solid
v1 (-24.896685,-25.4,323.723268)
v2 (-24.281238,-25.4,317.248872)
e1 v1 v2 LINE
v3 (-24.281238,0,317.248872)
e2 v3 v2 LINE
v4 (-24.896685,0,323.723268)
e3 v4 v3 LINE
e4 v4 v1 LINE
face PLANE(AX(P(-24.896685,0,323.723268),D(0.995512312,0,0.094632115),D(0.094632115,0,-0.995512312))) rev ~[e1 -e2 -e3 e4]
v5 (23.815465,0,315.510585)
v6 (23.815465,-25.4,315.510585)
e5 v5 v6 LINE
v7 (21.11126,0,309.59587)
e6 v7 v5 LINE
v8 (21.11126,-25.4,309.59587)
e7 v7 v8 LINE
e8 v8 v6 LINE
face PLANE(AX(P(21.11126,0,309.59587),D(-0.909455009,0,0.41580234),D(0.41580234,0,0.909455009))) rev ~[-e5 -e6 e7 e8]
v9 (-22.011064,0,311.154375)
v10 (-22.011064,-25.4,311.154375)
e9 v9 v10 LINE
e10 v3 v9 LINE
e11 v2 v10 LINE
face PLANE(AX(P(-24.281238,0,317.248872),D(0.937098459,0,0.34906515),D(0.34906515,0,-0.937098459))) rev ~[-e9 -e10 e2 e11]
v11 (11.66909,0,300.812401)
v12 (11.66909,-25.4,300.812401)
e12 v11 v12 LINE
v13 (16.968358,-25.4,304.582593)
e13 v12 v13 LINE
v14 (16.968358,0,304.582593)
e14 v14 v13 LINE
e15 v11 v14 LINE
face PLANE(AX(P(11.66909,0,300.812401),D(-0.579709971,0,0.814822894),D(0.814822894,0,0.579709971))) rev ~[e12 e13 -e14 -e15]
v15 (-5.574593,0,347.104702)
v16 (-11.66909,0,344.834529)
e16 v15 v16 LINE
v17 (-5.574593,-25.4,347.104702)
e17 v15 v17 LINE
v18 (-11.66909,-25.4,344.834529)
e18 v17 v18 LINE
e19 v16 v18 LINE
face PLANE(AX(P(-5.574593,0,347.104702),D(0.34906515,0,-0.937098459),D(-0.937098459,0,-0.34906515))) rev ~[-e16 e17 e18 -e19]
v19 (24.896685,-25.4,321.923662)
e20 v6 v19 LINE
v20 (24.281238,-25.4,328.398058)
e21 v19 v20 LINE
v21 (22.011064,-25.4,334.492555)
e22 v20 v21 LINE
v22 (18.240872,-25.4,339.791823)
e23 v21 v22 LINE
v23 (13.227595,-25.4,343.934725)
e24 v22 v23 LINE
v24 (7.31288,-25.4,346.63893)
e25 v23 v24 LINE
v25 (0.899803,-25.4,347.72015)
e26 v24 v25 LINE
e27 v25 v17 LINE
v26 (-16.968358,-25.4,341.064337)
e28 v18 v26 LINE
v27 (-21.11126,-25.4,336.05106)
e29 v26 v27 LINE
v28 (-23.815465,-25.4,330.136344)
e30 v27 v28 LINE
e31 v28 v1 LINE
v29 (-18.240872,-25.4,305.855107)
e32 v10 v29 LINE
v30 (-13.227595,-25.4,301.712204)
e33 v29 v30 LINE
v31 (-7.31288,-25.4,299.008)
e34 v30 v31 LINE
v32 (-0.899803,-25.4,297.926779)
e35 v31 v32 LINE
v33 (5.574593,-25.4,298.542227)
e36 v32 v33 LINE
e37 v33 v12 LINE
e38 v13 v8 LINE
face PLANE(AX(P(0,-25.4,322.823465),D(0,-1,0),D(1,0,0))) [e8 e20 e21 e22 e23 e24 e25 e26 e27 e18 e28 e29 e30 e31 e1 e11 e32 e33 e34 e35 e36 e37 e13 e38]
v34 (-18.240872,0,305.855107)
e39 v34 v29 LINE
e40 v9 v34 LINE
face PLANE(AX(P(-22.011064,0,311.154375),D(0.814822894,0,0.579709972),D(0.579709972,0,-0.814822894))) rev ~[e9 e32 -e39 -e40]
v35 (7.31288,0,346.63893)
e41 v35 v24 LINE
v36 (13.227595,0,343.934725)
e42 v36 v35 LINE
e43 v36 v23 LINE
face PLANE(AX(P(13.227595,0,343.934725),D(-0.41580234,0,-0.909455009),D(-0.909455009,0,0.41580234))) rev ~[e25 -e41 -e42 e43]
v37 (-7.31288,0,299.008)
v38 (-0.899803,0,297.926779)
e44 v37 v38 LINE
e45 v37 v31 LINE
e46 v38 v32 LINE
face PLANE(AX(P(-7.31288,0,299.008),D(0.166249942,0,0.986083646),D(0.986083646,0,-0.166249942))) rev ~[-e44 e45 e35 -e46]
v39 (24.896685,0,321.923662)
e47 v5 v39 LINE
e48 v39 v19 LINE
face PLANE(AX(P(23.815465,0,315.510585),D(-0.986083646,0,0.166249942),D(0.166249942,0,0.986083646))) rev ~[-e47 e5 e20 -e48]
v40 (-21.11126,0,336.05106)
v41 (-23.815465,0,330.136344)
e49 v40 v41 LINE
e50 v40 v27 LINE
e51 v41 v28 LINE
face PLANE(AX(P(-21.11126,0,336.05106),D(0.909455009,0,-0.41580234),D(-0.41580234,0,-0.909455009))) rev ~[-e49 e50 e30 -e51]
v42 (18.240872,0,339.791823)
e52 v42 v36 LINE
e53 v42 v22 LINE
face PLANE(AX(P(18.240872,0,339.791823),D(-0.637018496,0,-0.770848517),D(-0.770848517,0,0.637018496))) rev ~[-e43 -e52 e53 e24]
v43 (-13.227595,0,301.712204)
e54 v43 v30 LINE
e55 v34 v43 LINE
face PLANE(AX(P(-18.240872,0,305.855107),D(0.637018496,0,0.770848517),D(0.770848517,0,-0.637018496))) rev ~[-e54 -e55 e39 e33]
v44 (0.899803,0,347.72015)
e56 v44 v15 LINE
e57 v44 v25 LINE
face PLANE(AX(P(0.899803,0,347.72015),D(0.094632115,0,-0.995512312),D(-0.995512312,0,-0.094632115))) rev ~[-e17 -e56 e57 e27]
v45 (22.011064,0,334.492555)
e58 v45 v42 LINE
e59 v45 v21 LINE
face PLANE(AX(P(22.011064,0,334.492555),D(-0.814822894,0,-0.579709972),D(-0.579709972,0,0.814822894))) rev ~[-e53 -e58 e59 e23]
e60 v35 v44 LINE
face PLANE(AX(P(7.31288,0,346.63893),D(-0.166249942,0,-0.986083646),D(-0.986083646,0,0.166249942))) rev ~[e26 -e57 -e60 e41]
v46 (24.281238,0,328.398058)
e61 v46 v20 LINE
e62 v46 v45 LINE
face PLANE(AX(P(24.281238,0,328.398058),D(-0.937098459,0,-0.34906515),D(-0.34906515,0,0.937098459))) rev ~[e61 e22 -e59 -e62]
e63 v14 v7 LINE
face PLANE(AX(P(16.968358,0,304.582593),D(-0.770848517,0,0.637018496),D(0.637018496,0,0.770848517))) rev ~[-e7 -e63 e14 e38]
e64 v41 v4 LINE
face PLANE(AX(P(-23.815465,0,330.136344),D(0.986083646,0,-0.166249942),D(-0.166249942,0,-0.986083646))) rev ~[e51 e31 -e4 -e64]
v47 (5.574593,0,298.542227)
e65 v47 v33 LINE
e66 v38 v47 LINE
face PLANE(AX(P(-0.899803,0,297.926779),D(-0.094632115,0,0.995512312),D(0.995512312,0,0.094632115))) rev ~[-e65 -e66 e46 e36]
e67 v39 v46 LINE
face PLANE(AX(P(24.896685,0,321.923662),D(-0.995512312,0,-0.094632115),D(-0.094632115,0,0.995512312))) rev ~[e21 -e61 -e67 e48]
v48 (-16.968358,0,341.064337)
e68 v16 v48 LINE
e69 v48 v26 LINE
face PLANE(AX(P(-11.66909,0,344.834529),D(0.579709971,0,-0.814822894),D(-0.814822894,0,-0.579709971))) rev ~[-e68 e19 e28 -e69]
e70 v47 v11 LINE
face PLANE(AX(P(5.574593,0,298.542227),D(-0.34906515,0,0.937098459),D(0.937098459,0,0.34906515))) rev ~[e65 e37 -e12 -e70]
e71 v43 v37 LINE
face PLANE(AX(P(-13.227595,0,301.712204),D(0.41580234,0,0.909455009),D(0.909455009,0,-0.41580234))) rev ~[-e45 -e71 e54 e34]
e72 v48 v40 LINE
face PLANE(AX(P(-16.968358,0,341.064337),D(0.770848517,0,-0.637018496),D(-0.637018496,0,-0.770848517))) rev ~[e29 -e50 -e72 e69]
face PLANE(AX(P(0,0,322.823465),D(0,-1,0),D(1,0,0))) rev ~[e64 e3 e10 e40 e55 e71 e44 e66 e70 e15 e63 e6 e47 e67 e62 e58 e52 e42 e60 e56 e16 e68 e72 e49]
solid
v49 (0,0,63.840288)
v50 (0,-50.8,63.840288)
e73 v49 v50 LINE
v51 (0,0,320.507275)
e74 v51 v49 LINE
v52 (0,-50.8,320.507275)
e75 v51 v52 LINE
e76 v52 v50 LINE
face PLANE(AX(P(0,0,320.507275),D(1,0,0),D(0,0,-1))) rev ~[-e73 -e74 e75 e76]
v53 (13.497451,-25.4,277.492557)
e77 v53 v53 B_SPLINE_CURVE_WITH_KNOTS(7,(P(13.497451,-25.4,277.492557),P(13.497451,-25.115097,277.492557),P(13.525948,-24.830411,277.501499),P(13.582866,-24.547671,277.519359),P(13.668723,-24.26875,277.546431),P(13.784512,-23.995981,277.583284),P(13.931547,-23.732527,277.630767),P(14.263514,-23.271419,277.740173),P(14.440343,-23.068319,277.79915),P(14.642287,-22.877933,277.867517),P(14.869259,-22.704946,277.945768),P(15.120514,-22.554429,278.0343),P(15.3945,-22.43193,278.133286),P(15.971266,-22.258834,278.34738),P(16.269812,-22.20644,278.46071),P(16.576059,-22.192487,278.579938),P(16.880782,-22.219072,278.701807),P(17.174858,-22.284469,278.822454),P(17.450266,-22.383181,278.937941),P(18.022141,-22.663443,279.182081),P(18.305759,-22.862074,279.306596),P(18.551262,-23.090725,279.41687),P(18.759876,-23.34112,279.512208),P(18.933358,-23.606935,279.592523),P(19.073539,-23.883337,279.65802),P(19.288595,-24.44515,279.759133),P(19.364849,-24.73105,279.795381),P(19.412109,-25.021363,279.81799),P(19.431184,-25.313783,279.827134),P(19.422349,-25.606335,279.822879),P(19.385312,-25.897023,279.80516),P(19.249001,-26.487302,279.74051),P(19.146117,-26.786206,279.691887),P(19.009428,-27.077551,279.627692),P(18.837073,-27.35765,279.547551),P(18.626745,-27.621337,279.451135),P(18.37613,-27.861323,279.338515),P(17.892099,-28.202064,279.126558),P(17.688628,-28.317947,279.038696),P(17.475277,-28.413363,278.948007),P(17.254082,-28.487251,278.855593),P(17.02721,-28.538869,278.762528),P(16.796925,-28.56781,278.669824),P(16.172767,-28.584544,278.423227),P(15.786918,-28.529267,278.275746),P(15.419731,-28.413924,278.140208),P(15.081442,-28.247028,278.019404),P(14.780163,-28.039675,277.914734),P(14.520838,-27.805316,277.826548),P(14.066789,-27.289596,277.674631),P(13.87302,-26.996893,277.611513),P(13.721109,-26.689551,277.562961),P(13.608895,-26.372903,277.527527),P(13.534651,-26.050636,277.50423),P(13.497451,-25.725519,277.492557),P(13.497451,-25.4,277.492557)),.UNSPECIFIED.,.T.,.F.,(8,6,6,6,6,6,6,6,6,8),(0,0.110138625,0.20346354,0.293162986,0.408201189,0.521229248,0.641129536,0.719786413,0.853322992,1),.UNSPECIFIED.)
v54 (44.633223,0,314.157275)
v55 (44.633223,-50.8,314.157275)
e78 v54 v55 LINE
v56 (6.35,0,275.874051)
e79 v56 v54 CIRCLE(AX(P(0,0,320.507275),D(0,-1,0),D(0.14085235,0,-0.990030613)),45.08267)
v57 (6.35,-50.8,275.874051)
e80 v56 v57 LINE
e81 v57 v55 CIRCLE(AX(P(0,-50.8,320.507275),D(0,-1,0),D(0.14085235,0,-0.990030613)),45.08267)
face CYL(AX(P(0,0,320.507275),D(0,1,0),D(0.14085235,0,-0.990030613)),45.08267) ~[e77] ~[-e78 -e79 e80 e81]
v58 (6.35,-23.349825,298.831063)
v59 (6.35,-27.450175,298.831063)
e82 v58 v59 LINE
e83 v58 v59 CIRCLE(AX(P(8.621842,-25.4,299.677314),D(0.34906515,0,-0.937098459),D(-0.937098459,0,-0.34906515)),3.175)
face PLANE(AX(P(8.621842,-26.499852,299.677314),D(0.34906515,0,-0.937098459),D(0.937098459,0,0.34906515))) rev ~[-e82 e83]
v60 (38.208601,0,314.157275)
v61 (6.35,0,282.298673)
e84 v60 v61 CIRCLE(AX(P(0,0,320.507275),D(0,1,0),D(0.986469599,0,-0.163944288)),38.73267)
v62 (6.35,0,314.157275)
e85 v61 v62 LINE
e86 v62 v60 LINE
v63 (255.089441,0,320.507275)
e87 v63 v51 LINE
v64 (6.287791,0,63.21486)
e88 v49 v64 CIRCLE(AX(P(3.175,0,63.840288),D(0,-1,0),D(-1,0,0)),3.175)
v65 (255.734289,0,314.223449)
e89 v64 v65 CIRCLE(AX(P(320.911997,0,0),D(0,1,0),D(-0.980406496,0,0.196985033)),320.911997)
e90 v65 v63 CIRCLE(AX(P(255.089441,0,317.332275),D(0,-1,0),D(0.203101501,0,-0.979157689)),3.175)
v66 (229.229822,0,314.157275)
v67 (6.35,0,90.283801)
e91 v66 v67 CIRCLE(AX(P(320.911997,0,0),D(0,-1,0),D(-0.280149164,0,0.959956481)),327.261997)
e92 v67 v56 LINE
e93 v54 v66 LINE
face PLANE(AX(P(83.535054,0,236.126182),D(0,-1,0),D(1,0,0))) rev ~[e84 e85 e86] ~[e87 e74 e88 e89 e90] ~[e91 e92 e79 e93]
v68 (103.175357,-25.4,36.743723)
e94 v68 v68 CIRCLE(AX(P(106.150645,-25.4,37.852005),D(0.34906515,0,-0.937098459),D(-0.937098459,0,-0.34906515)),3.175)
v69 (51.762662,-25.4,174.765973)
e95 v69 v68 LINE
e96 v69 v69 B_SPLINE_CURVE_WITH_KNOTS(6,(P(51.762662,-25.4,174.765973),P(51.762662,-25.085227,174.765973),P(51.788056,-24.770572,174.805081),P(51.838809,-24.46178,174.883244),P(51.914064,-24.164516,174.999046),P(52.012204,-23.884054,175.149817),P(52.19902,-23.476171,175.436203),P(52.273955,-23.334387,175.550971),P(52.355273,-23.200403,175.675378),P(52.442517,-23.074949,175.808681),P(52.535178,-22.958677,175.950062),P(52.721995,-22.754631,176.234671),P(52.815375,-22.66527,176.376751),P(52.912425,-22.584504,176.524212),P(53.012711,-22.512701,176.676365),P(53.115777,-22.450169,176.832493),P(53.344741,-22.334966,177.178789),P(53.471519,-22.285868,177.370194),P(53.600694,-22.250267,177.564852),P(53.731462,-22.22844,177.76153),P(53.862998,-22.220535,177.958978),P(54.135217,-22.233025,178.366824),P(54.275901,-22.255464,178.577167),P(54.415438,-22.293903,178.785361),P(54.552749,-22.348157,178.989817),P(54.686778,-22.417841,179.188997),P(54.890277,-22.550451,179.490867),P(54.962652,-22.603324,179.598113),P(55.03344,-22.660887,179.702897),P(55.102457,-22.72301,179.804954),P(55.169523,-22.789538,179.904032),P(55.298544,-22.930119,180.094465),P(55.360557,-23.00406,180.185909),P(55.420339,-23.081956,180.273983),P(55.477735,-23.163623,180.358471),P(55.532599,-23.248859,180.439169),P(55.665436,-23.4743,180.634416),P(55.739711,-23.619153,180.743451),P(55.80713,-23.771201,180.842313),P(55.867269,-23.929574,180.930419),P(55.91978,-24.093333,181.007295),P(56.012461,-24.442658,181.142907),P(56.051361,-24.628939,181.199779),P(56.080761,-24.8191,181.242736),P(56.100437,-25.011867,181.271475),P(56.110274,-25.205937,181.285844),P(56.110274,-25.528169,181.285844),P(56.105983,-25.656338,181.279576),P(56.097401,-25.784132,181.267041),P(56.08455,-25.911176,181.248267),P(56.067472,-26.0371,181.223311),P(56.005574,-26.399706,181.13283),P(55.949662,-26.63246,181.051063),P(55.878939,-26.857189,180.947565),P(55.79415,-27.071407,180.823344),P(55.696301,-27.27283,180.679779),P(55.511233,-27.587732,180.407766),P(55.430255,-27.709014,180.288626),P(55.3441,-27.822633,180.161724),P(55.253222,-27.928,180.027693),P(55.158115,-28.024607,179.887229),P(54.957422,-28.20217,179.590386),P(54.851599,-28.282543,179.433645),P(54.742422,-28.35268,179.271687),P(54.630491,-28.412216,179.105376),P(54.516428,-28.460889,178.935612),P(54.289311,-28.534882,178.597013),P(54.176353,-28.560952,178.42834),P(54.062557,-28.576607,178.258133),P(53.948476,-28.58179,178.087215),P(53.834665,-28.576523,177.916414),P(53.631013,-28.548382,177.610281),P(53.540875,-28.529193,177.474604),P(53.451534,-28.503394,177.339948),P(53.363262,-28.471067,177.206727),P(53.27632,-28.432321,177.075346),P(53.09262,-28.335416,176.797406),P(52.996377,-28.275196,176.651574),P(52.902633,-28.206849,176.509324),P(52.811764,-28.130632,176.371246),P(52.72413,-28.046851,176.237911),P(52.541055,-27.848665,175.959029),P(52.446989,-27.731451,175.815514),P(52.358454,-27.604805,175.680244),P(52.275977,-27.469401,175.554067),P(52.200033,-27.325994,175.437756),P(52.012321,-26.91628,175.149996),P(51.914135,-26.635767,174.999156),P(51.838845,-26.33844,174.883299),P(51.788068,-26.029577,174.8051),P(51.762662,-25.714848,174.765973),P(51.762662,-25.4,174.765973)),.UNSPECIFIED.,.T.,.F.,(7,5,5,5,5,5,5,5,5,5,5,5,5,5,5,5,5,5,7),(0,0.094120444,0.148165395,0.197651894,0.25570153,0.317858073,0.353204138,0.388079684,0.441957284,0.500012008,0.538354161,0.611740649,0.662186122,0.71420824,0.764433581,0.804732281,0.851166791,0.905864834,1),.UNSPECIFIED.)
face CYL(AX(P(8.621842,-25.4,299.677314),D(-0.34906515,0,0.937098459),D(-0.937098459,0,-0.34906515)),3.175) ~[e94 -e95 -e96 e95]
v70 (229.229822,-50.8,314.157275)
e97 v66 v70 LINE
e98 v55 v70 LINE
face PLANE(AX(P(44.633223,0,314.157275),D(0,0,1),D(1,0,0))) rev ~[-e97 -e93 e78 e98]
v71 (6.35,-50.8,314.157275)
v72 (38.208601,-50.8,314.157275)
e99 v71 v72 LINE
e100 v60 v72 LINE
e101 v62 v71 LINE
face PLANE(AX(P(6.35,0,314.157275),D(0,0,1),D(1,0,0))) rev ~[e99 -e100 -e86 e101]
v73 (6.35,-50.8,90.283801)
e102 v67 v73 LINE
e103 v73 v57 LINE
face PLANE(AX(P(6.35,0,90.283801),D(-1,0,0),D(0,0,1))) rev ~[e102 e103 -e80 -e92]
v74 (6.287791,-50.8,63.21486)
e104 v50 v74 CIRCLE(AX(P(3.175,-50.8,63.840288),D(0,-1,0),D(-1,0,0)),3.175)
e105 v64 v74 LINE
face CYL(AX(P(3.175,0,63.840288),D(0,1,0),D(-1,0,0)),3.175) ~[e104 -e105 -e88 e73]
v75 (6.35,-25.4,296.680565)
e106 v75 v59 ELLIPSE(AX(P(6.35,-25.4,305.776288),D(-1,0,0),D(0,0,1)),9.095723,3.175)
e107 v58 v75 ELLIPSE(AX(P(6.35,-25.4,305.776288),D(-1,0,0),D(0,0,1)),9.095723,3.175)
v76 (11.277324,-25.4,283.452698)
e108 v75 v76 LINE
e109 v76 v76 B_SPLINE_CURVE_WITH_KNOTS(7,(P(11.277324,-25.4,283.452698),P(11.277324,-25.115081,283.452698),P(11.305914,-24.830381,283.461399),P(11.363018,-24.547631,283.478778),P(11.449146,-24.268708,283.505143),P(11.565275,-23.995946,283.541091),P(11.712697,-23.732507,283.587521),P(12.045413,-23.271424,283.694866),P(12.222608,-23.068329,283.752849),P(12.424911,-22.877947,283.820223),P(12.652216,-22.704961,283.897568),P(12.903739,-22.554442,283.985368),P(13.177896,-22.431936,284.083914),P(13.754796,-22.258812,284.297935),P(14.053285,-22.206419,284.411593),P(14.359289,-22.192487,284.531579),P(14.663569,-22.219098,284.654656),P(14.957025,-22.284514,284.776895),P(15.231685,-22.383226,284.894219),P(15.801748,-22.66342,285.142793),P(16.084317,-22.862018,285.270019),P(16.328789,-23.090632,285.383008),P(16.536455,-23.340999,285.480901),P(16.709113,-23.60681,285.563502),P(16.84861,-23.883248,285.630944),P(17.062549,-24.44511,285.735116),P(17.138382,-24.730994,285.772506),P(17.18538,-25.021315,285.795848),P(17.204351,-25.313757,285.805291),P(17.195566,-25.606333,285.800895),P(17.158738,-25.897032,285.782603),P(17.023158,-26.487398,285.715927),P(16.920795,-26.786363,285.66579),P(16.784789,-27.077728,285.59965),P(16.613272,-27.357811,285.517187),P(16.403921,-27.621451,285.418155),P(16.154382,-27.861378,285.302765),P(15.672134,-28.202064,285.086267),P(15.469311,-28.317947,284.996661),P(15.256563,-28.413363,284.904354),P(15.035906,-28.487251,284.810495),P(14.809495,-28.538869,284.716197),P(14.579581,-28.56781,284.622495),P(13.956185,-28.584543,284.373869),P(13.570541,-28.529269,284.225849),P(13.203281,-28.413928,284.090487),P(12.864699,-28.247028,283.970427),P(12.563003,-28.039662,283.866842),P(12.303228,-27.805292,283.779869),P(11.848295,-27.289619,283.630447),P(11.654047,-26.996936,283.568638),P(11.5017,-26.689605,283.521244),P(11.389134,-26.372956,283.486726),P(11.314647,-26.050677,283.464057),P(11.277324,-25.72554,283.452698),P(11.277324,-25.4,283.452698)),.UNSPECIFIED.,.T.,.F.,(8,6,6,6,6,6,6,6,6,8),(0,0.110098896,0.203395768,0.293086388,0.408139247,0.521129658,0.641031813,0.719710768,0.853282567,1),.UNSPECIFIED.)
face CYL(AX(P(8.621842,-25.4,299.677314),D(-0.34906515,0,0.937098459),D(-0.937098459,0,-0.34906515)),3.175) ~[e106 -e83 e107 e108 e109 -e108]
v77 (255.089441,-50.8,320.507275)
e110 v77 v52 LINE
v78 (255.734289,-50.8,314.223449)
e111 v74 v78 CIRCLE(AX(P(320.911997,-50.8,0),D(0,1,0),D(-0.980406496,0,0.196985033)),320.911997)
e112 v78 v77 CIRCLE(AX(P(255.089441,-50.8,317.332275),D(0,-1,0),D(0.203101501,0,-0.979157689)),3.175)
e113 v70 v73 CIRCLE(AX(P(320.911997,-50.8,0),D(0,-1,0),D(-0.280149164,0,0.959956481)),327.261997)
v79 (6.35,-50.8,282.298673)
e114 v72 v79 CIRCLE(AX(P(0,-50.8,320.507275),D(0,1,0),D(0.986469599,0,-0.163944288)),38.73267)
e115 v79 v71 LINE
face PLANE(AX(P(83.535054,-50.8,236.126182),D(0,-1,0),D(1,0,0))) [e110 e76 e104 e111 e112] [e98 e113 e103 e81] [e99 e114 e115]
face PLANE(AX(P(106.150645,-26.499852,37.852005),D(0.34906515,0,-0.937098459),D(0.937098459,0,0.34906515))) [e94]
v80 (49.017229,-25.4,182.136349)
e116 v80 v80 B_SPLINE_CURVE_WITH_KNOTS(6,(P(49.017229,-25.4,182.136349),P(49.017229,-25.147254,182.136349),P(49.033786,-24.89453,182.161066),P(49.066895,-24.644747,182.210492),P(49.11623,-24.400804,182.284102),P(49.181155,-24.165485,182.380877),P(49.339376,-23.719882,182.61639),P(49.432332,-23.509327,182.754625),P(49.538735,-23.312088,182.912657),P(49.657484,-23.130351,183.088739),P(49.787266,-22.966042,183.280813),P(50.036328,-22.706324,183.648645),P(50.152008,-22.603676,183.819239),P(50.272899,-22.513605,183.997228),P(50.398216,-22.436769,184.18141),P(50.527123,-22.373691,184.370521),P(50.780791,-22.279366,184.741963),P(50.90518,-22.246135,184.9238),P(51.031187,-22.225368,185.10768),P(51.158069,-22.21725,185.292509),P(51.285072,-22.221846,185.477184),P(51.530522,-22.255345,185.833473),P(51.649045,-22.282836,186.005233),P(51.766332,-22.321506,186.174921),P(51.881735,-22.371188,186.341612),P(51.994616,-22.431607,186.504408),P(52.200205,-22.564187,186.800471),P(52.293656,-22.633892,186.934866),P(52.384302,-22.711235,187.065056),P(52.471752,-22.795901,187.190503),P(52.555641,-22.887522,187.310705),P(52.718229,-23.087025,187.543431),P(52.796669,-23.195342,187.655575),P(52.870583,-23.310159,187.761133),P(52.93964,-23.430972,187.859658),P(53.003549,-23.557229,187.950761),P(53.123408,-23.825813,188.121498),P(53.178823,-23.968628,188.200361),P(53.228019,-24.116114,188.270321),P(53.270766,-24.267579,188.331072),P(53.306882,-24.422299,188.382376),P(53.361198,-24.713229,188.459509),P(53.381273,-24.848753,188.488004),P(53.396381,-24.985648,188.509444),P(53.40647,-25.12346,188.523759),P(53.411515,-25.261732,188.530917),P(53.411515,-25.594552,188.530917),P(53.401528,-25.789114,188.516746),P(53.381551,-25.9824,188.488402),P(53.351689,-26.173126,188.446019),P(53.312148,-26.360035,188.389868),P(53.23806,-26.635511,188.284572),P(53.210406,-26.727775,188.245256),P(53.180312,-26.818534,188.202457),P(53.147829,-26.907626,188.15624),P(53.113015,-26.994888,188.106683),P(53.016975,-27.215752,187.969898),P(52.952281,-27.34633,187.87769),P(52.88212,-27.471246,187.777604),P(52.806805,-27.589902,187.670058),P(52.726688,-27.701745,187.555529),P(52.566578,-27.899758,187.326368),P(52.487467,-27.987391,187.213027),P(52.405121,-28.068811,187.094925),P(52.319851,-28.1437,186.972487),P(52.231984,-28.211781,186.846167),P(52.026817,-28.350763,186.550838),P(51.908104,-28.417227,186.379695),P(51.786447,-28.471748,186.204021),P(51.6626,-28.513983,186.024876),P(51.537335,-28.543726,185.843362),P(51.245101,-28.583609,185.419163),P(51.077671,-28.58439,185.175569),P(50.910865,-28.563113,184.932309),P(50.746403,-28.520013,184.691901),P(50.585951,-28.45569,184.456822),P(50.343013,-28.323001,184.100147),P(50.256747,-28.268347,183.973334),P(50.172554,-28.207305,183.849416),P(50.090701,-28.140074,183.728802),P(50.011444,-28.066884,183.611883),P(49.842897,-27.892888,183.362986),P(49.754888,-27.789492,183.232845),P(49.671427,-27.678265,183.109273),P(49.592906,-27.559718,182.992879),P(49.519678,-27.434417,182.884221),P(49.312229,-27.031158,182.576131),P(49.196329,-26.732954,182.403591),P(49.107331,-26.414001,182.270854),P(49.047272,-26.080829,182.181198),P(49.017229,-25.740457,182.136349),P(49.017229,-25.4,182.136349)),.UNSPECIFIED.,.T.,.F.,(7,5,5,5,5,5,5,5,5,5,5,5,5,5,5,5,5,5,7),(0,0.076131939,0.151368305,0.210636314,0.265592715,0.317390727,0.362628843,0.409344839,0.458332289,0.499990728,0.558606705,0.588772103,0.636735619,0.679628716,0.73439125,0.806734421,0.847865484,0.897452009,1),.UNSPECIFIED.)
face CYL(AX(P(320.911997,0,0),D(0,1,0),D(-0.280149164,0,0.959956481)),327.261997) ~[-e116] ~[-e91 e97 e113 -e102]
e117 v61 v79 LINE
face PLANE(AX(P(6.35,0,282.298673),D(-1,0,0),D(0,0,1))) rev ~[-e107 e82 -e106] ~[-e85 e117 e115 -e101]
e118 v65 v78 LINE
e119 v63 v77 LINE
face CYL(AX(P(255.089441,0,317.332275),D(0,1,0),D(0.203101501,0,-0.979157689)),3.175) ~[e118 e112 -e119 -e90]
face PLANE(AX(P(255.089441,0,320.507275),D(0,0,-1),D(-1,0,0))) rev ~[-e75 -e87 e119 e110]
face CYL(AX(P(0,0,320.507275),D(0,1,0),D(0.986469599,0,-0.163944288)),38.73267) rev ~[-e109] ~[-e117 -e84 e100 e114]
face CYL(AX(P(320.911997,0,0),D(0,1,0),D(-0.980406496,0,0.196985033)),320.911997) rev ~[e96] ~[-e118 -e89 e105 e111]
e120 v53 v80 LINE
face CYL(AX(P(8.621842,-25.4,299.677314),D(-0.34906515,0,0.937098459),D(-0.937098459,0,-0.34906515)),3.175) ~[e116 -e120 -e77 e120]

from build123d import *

# Parameters (mm, degrees)
F1_DEPTH = 50.8
F3_DEPTH = 25.4
F6_DEPTH = 279.4


with BuildPart() as f1:
    # F0 (on Front) → F1 (new body)
    with BuildSketch(Plane.XZ):
        with BuildLine():
            Line((0, 320.5072749112), (0, 63.8402879052))
            ThreePointArc((0, 63.8402879052), (2.8607431223, 60.6808785276), (6.2877906235, 63.214860424))
            ThreePointArc((6.2877906235, 63.214860424), (93.2857648732, 226.2096554871), (255.734288563, 314.2234492481))
            ThreePointArc((255.734288563, 314.2234492481), (258.247854386, 317.6563918034), (255.0894412971, 320.5072749112))
            Line((255.0894412971, 320.5072749112), (0, 320.5072749112))
        make_face()
        with BuildLine():
            Line((6.35, 275.8740514516), (6.35, 282.2986734306))
            Line((6.35, 282.2986734306), (6.35, 314.1572749112))
            Line((6.35, 314.1572749112), (38.2086014806, 314.1572749112))
            Line((38.2086014806, 314.1572749112), (44.6332234596, 314.1572749112))
            Line((44.6332234596, 314.1572749112), (229.2298219421, 314.1572749112))
            ThreePointArc((229.2298219421, 314.1572749112), (88.988701653, 230.893914438), (6.35, 90.2838009813))
            Line((6.35, 90.2838009813), (6.35, 275.8740514516))
        make_face(mode=Mode.SUBTRACT)
        with BuildLine():
            ThreePointArc((38.2086014806, 314.1572749112), (27.3881336266, 293.1191412846), (6.35, 282.2986734306))
            Line((6.35, 282.2986734306), (6.35, 275.8740514516))
            ThreePointArc((6.35, 275.8740514516), (31.8782616872, 288.629013224), (44.6332234596, 314.1572749112))
            Line((44.6332234596, 314.1572749112), (38.2086014806, 314.1572749112))
        make_face()
    extrude(amount=F1_DEPTH)

    # F4 (on face) → F6 (join)
    with BuildSketch(Plane(origin=(-96.9764298817, 0, 260.3424117621), x_dir=(0.9370984586, 0, 0.3490651498), z_dir=(0.3490651498, 0, -0.9370984586))):
        with BuildLine():
            Line((109.5114211305, 25.4), (115.8614211305, 25.4))
            ThreePointArc((115.8614211305, 25.4), (112.6864211305, 28.575), (109.5114211305, 25.4))
        make_face()
        with BuildLine():
            ThreePointArc((109.5114211305, 25.4), (112.6864211305, 22.225), (115.8614211305, 25.4))
            Line((115.8614211305, 25.4), (109.5114211305, 25.4))
        make_face()
    extrude(amount=F6_DEPTH)


with BuildPart() as f3:
    # F2 (on Front) → F3 (new body)
    with BuildSketch(Plane.XZ):
        Polygon((24.2812376232, 328.3980579991), (22.0110636442, 334.49255508), (18.2408720527, 339.7918229472), (13.2275951754, 343.934725253), (7.3128795465, 346.6389300518), (0.8998032616, 347.7201502554), (-5.5745931286, 347.1047024937), (-11.6690902095, 344.8345285146), (-16.9683580768, 341.0643369232), (-21.1112603826, 336.0510600458), (-23.8154651814, 330.1363444169), (-24.8966853849, 323.723268132), (-24.2812376232, 317.2488717418), (-22.0110636442, 311.1543746609), (-18.2408720527, 305.8551067937), (-13.2275951754, 301.7122044879), (-7.3128795465, 299.0079996891), (-0.8998032616, 297.9267794855), (5.5745931286, 298.5422272472), (11.6690902095, 300.8124012263), (16.9683580768, 304.5825928177), (21.1112603826, 309.5958696951), (23.8154651814, 315.510585324), (24.8966853849, 321.9236616089), align=None)
    extrude(amount=F3_DEPTH)


solid = Compound([f1.part, f3.part])
